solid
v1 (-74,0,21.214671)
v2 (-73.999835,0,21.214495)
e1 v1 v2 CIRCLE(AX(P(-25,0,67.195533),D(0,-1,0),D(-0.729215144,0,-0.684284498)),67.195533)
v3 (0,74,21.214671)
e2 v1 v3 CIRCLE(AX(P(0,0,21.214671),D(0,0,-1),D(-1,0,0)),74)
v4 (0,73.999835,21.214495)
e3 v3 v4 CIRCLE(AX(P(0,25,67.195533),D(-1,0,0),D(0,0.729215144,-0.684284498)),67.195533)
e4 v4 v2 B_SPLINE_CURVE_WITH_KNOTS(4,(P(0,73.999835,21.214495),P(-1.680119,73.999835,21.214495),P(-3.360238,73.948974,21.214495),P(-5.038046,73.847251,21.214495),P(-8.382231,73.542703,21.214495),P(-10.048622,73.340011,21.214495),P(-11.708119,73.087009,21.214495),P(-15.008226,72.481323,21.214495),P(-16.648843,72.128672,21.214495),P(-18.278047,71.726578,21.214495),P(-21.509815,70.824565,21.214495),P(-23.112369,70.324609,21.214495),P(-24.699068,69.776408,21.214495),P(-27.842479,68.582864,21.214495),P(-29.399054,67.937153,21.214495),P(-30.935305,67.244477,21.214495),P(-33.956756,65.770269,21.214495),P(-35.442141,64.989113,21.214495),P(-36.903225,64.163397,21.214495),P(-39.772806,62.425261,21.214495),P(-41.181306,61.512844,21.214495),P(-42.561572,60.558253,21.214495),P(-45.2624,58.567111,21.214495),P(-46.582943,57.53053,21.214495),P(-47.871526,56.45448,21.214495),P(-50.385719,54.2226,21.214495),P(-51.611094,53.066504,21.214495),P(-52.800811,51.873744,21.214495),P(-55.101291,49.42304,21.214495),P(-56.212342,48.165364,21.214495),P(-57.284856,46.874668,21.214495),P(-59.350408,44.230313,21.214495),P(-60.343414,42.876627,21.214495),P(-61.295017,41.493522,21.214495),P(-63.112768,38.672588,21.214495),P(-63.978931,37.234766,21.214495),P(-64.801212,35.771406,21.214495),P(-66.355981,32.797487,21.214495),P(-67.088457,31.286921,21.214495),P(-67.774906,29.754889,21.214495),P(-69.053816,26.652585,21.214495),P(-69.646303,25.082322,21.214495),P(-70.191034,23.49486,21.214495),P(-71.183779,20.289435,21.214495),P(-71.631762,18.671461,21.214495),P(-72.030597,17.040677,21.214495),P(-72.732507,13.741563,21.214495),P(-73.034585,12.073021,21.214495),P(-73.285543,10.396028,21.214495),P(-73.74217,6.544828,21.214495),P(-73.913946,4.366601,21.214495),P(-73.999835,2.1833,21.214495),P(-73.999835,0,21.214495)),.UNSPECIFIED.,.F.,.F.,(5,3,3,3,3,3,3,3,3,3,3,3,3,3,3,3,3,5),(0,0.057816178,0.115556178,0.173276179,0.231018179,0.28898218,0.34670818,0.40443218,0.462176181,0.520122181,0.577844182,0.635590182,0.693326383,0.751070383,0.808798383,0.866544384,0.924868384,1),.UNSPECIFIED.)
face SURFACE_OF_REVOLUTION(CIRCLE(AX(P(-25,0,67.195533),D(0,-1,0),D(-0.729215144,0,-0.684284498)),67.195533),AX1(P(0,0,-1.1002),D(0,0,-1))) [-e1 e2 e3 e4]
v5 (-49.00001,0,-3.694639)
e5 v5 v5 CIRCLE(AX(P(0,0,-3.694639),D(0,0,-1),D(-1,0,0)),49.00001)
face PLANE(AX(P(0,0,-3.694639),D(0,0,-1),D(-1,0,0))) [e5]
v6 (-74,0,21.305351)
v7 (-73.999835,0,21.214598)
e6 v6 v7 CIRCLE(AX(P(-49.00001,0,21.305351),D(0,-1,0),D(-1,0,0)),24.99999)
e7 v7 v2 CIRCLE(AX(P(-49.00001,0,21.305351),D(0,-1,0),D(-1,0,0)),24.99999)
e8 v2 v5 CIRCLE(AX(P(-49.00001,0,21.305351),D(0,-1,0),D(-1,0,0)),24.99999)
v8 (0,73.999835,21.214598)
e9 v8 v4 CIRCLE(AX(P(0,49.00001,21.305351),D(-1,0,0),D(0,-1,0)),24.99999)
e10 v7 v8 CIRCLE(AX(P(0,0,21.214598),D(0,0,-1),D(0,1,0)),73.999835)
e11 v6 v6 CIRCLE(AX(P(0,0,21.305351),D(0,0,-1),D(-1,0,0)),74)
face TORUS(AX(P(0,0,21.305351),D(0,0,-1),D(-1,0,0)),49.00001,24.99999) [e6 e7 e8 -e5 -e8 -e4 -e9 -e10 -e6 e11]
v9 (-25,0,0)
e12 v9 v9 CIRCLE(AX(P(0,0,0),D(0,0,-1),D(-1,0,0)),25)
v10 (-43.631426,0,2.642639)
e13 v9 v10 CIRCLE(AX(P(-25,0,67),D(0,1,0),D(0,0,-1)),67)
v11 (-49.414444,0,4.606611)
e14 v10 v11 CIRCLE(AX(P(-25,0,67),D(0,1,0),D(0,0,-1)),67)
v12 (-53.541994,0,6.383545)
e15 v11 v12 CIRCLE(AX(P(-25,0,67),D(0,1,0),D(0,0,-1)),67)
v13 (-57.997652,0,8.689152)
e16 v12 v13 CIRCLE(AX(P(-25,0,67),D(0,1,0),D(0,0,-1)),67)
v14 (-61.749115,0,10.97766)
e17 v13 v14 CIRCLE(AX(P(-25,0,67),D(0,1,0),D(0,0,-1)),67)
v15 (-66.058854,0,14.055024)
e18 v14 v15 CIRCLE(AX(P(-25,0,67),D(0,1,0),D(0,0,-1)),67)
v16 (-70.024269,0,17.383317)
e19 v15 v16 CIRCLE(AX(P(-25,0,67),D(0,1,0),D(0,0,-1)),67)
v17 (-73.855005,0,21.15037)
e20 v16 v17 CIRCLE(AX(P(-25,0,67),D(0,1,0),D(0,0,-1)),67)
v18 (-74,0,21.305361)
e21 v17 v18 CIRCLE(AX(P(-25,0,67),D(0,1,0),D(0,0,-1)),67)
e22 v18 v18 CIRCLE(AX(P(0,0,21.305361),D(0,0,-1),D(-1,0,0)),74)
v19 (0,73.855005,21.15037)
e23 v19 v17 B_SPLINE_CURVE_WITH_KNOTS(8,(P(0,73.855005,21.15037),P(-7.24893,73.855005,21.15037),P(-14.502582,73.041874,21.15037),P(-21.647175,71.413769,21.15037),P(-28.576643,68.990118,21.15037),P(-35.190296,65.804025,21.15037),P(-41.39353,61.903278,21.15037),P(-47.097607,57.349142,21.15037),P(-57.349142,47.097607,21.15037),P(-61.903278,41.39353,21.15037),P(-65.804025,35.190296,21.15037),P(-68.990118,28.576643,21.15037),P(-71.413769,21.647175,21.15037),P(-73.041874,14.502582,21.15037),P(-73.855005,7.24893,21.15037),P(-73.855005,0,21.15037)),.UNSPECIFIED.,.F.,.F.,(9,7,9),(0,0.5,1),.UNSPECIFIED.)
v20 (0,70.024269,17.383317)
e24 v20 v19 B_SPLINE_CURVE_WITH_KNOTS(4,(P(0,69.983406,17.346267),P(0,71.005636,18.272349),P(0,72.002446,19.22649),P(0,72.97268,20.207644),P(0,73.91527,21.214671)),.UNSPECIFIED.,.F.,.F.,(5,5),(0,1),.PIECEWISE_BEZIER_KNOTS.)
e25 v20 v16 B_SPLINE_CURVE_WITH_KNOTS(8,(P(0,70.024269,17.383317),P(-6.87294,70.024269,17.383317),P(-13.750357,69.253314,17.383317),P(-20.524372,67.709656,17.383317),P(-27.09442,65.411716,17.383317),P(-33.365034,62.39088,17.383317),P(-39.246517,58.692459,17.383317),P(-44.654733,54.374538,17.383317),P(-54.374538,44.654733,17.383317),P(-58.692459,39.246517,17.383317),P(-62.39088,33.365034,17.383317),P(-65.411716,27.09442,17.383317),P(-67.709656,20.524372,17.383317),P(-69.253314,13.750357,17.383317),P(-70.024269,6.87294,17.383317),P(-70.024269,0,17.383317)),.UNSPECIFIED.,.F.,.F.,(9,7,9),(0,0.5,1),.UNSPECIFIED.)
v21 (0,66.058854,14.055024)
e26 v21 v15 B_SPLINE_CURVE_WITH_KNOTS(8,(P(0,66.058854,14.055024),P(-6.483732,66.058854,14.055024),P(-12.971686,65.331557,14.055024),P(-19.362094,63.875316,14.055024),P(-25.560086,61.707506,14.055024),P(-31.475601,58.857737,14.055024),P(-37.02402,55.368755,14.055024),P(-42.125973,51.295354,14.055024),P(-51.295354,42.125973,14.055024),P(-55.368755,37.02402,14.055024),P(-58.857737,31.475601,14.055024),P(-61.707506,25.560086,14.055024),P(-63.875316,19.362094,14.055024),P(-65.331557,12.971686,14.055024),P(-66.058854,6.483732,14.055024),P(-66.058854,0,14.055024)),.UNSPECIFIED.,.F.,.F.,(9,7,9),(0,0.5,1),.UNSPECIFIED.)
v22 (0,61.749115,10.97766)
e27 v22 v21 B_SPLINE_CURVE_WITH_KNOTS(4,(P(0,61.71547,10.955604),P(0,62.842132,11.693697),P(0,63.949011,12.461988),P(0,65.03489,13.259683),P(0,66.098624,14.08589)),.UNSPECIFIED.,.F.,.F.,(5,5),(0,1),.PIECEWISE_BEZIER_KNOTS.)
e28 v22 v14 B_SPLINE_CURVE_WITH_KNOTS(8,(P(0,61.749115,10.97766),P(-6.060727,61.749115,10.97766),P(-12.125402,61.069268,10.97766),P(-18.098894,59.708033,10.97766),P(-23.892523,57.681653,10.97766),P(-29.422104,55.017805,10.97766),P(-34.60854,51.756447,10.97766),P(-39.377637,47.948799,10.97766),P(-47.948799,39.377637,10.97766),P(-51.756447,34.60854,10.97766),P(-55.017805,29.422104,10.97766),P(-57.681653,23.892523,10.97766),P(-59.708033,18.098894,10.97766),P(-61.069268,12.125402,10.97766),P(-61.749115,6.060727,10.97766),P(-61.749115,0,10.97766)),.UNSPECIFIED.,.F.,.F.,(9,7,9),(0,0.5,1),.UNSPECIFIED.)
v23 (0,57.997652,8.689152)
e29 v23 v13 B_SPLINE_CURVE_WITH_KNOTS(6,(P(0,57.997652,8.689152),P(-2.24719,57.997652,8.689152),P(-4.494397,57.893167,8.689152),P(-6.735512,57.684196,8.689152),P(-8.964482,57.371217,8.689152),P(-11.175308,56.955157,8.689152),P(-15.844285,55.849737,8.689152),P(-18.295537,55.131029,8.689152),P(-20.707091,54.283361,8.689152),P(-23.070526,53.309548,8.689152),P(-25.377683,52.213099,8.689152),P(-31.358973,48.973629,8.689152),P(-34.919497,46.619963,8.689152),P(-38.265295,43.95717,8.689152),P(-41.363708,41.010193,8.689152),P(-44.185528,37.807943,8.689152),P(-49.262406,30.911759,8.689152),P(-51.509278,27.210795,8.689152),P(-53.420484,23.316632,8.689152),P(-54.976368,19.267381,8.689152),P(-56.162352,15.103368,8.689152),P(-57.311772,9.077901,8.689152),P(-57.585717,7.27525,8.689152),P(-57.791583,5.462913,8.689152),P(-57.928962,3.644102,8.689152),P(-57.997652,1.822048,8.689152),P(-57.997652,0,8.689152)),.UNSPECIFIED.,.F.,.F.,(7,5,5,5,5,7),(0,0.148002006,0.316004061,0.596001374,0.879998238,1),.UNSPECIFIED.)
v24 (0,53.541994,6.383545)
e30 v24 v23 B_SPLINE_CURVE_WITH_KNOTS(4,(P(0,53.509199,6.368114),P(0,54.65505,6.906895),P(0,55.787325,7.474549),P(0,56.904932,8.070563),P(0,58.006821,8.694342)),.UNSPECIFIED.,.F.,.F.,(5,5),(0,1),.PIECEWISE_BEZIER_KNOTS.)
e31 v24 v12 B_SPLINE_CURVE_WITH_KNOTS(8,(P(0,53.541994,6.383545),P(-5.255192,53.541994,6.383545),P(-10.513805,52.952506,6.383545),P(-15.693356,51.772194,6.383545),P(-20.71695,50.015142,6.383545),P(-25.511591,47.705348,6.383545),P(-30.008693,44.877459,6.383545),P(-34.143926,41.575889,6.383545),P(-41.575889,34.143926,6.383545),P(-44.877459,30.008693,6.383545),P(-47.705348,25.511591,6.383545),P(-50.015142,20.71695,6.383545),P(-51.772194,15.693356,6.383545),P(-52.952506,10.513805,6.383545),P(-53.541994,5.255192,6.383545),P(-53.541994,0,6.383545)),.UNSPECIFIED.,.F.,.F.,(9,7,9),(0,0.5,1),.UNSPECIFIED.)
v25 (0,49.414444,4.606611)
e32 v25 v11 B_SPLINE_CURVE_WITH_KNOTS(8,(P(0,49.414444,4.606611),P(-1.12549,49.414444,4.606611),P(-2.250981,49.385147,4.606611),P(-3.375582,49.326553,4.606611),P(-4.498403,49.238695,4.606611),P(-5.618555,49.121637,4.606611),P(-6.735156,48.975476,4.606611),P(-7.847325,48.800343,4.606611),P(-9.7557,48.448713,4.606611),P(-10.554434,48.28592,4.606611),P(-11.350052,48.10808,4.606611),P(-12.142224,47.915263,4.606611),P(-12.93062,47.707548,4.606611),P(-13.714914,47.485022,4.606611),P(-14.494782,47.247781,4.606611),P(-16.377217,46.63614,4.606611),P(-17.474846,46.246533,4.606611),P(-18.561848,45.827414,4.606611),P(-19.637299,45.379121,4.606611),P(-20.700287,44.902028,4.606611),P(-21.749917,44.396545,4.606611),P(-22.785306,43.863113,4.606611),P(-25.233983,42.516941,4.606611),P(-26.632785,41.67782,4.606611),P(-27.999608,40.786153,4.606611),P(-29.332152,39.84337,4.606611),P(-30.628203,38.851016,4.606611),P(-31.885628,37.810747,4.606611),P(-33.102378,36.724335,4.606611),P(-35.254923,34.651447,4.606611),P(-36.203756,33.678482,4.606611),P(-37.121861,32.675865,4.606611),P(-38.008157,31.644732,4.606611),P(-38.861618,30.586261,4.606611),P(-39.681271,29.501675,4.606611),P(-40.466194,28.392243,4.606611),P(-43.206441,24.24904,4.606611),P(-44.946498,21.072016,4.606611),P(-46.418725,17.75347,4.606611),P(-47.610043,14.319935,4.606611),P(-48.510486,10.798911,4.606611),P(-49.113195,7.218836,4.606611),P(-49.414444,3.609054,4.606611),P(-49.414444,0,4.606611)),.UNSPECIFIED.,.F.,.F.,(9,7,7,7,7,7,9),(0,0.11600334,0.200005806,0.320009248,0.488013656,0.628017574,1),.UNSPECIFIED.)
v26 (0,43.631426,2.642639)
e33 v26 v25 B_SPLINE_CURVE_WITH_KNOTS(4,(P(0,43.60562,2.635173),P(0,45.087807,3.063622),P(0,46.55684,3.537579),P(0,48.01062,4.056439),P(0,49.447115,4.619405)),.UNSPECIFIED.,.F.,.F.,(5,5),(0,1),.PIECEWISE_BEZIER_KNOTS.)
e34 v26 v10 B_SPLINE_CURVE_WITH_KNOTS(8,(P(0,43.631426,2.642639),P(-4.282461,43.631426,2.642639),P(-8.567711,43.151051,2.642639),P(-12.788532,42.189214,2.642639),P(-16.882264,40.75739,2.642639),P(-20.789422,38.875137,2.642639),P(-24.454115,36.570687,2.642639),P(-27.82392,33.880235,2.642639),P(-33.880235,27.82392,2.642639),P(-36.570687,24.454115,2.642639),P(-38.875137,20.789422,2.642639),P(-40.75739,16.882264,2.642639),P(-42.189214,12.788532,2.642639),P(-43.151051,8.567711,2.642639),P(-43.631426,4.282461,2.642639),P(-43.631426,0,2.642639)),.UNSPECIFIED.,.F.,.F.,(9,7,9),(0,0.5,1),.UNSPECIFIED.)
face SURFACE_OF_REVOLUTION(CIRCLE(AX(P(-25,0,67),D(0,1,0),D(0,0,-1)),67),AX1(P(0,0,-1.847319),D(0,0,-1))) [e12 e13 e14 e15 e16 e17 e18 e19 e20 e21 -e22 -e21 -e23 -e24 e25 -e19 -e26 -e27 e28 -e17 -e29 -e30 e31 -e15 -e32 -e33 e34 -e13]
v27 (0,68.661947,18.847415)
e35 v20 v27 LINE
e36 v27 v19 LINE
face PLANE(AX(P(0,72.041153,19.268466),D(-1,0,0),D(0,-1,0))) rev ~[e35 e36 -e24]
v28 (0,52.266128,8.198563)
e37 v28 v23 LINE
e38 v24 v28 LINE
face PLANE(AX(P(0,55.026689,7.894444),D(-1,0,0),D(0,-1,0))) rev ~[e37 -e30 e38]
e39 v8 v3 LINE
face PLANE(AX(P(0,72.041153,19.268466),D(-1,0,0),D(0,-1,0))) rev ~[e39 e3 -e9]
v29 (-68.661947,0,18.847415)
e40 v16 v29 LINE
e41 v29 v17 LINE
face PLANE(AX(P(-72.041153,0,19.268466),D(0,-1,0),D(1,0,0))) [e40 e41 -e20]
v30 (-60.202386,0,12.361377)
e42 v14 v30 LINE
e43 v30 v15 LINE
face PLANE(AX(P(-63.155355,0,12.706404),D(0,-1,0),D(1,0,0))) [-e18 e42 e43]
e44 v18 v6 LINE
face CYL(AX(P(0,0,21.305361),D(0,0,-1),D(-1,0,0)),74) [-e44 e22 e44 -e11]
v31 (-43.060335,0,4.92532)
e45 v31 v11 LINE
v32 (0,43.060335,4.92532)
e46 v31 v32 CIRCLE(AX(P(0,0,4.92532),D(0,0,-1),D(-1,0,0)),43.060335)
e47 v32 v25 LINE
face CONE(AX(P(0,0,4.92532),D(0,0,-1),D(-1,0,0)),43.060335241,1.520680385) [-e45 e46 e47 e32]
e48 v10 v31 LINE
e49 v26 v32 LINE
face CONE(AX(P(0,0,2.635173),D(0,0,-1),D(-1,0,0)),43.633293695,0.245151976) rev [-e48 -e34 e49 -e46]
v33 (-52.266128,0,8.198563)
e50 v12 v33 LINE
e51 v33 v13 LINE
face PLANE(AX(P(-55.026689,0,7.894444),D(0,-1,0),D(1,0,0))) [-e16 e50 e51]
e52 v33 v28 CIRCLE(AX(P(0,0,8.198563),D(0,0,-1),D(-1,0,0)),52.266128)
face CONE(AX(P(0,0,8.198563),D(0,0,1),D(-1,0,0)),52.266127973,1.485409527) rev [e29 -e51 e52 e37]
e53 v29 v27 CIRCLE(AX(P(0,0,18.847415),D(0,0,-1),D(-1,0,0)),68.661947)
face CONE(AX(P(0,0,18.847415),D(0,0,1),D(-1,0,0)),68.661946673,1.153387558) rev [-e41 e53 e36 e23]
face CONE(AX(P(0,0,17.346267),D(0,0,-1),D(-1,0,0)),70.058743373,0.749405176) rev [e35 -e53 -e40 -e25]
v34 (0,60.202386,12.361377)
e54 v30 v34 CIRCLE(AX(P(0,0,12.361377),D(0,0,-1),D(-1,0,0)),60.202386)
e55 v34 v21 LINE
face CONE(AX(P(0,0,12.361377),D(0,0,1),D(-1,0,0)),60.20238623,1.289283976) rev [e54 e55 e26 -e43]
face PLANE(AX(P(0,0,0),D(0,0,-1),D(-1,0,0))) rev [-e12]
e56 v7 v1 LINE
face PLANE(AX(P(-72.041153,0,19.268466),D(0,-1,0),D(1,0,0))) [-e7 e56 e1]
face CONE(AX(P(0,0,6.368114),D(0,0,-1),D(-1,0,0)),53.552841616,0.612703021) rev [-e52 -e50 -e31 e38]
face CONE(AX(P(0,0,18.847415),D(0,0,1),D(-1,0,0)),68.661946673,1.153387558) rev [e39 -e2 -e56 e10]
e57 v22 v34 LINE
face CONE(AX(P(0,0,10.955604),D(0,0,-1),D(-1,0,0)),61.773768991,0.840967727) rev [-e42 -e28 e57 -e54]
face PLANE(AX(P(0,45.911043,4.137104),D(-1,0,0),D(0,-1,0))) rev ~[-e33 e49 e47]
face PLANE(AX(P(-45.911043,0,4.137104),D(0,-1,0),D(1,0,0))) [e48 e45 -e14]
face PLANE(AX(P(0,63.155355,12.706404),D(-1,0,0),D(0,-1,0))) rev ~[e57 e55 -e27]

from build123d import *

# Parameters (mm, degrees)
F2_R     = 24.99999
F4_ANGLE = 90


# Not quite as in the source:
# - a fillet or chamfer is up to 0.001 mm smaller than in the source, because OpenCascade refuses the exact size


with BuildPart() as f1:
    # F0 (on Front) → F1 (revolve)
    with BuildSketch(Plane.XZ):
        with BuildLine():
            Line((0, -3.6946386352), (0, 0))
            Line((0, 0), (-25, 0))
            ThreePointArc((-25, 0), (-51.7157183269, 5.5567709647), (-74, 21.3053613648))
            Line((-74, 21.3053613648), (-74, -3.6946386352))
            Line((-74, -3.6946386352), (0, -3.6946386352))
        make_face()
    revolve(axis=Axis((0, 0, -1.8473193176), (0, 0, -1)))

    # F2 (radius 25 in the source; OpenCascade refuses exactly that, so slightly less here)
    f2_edges = [f1.edges().sort_by_distance(p)[0] for p in [
        (74, 0, -3.694639),
    ]]
    fillet(f2_edges, radius=F2_R)

    # F3 (on Front) → F4 (revolve)
    with BuildSketch(Plane.XZ):
        with BuildLine():
            Line((-70.0587433731, 17.3462673245), (-74, 21.2146713292))
            ThreePointArc((-74, 21.2146713292), (-72.0691293591, 19.2399629087), (-70.0587433731, 17.3462673245))
        make_face()
        Polygon((-43.0603352406, 4.9253203614), (-49.4471145262, 4.6049726638), (-43.633293695, 2.6351734955), align=None)
        with BuildLine():
            Line((-43.633293695, 2.6351734955), (-49.4471145262, 4.6049726638))
            ThreePointArc((-49.4471145262, 4.6049726638), (-46.5627090209, 3.5536503103), (-43.633293695, 2.6351734955))
        make_face()
        Polygon((-52.2661279734, 8.1985627052), (-58.0582865363, 8.6943420701), (-53.5528416158, 6.368114131), align=None)
        with BuildLine():
            Line((-53.5528416158, 6.368114131), (-58.0582865363, 8.6943420701))
            ThreePointArc((-58.0582865363, 8.6943420701), (-55.8275138821, 7.4887156535), (-53.5528416158, 6.368114131))
        make_face()
        Polygon((-60.2023862302, 12.3613774776), (-66.1655854553, 14.085889627), (-61.7737689908, 10.9556044658), align=None)
        with BuildLine():
            Line((-61.7737689908, 10.9556044658), (-66.1655854553, 14.085889627))
            ThreePointArc((-66.1655854553, 14.085889627), (-64.001095038, 12.4766675871), (-61.7737689908, 10.9556044658))
        make_face()
        Polygon((-68.6619466735, 18.8474147571), (-74, 21.2146713292), (-70.0587433731, 17.3462673245), align=None)
    revolve(axis=Axis((0, 0, -1.1001997627), (0, 0, -1)), revolution_arc=F4_ANGLE)


solid = f1.part
